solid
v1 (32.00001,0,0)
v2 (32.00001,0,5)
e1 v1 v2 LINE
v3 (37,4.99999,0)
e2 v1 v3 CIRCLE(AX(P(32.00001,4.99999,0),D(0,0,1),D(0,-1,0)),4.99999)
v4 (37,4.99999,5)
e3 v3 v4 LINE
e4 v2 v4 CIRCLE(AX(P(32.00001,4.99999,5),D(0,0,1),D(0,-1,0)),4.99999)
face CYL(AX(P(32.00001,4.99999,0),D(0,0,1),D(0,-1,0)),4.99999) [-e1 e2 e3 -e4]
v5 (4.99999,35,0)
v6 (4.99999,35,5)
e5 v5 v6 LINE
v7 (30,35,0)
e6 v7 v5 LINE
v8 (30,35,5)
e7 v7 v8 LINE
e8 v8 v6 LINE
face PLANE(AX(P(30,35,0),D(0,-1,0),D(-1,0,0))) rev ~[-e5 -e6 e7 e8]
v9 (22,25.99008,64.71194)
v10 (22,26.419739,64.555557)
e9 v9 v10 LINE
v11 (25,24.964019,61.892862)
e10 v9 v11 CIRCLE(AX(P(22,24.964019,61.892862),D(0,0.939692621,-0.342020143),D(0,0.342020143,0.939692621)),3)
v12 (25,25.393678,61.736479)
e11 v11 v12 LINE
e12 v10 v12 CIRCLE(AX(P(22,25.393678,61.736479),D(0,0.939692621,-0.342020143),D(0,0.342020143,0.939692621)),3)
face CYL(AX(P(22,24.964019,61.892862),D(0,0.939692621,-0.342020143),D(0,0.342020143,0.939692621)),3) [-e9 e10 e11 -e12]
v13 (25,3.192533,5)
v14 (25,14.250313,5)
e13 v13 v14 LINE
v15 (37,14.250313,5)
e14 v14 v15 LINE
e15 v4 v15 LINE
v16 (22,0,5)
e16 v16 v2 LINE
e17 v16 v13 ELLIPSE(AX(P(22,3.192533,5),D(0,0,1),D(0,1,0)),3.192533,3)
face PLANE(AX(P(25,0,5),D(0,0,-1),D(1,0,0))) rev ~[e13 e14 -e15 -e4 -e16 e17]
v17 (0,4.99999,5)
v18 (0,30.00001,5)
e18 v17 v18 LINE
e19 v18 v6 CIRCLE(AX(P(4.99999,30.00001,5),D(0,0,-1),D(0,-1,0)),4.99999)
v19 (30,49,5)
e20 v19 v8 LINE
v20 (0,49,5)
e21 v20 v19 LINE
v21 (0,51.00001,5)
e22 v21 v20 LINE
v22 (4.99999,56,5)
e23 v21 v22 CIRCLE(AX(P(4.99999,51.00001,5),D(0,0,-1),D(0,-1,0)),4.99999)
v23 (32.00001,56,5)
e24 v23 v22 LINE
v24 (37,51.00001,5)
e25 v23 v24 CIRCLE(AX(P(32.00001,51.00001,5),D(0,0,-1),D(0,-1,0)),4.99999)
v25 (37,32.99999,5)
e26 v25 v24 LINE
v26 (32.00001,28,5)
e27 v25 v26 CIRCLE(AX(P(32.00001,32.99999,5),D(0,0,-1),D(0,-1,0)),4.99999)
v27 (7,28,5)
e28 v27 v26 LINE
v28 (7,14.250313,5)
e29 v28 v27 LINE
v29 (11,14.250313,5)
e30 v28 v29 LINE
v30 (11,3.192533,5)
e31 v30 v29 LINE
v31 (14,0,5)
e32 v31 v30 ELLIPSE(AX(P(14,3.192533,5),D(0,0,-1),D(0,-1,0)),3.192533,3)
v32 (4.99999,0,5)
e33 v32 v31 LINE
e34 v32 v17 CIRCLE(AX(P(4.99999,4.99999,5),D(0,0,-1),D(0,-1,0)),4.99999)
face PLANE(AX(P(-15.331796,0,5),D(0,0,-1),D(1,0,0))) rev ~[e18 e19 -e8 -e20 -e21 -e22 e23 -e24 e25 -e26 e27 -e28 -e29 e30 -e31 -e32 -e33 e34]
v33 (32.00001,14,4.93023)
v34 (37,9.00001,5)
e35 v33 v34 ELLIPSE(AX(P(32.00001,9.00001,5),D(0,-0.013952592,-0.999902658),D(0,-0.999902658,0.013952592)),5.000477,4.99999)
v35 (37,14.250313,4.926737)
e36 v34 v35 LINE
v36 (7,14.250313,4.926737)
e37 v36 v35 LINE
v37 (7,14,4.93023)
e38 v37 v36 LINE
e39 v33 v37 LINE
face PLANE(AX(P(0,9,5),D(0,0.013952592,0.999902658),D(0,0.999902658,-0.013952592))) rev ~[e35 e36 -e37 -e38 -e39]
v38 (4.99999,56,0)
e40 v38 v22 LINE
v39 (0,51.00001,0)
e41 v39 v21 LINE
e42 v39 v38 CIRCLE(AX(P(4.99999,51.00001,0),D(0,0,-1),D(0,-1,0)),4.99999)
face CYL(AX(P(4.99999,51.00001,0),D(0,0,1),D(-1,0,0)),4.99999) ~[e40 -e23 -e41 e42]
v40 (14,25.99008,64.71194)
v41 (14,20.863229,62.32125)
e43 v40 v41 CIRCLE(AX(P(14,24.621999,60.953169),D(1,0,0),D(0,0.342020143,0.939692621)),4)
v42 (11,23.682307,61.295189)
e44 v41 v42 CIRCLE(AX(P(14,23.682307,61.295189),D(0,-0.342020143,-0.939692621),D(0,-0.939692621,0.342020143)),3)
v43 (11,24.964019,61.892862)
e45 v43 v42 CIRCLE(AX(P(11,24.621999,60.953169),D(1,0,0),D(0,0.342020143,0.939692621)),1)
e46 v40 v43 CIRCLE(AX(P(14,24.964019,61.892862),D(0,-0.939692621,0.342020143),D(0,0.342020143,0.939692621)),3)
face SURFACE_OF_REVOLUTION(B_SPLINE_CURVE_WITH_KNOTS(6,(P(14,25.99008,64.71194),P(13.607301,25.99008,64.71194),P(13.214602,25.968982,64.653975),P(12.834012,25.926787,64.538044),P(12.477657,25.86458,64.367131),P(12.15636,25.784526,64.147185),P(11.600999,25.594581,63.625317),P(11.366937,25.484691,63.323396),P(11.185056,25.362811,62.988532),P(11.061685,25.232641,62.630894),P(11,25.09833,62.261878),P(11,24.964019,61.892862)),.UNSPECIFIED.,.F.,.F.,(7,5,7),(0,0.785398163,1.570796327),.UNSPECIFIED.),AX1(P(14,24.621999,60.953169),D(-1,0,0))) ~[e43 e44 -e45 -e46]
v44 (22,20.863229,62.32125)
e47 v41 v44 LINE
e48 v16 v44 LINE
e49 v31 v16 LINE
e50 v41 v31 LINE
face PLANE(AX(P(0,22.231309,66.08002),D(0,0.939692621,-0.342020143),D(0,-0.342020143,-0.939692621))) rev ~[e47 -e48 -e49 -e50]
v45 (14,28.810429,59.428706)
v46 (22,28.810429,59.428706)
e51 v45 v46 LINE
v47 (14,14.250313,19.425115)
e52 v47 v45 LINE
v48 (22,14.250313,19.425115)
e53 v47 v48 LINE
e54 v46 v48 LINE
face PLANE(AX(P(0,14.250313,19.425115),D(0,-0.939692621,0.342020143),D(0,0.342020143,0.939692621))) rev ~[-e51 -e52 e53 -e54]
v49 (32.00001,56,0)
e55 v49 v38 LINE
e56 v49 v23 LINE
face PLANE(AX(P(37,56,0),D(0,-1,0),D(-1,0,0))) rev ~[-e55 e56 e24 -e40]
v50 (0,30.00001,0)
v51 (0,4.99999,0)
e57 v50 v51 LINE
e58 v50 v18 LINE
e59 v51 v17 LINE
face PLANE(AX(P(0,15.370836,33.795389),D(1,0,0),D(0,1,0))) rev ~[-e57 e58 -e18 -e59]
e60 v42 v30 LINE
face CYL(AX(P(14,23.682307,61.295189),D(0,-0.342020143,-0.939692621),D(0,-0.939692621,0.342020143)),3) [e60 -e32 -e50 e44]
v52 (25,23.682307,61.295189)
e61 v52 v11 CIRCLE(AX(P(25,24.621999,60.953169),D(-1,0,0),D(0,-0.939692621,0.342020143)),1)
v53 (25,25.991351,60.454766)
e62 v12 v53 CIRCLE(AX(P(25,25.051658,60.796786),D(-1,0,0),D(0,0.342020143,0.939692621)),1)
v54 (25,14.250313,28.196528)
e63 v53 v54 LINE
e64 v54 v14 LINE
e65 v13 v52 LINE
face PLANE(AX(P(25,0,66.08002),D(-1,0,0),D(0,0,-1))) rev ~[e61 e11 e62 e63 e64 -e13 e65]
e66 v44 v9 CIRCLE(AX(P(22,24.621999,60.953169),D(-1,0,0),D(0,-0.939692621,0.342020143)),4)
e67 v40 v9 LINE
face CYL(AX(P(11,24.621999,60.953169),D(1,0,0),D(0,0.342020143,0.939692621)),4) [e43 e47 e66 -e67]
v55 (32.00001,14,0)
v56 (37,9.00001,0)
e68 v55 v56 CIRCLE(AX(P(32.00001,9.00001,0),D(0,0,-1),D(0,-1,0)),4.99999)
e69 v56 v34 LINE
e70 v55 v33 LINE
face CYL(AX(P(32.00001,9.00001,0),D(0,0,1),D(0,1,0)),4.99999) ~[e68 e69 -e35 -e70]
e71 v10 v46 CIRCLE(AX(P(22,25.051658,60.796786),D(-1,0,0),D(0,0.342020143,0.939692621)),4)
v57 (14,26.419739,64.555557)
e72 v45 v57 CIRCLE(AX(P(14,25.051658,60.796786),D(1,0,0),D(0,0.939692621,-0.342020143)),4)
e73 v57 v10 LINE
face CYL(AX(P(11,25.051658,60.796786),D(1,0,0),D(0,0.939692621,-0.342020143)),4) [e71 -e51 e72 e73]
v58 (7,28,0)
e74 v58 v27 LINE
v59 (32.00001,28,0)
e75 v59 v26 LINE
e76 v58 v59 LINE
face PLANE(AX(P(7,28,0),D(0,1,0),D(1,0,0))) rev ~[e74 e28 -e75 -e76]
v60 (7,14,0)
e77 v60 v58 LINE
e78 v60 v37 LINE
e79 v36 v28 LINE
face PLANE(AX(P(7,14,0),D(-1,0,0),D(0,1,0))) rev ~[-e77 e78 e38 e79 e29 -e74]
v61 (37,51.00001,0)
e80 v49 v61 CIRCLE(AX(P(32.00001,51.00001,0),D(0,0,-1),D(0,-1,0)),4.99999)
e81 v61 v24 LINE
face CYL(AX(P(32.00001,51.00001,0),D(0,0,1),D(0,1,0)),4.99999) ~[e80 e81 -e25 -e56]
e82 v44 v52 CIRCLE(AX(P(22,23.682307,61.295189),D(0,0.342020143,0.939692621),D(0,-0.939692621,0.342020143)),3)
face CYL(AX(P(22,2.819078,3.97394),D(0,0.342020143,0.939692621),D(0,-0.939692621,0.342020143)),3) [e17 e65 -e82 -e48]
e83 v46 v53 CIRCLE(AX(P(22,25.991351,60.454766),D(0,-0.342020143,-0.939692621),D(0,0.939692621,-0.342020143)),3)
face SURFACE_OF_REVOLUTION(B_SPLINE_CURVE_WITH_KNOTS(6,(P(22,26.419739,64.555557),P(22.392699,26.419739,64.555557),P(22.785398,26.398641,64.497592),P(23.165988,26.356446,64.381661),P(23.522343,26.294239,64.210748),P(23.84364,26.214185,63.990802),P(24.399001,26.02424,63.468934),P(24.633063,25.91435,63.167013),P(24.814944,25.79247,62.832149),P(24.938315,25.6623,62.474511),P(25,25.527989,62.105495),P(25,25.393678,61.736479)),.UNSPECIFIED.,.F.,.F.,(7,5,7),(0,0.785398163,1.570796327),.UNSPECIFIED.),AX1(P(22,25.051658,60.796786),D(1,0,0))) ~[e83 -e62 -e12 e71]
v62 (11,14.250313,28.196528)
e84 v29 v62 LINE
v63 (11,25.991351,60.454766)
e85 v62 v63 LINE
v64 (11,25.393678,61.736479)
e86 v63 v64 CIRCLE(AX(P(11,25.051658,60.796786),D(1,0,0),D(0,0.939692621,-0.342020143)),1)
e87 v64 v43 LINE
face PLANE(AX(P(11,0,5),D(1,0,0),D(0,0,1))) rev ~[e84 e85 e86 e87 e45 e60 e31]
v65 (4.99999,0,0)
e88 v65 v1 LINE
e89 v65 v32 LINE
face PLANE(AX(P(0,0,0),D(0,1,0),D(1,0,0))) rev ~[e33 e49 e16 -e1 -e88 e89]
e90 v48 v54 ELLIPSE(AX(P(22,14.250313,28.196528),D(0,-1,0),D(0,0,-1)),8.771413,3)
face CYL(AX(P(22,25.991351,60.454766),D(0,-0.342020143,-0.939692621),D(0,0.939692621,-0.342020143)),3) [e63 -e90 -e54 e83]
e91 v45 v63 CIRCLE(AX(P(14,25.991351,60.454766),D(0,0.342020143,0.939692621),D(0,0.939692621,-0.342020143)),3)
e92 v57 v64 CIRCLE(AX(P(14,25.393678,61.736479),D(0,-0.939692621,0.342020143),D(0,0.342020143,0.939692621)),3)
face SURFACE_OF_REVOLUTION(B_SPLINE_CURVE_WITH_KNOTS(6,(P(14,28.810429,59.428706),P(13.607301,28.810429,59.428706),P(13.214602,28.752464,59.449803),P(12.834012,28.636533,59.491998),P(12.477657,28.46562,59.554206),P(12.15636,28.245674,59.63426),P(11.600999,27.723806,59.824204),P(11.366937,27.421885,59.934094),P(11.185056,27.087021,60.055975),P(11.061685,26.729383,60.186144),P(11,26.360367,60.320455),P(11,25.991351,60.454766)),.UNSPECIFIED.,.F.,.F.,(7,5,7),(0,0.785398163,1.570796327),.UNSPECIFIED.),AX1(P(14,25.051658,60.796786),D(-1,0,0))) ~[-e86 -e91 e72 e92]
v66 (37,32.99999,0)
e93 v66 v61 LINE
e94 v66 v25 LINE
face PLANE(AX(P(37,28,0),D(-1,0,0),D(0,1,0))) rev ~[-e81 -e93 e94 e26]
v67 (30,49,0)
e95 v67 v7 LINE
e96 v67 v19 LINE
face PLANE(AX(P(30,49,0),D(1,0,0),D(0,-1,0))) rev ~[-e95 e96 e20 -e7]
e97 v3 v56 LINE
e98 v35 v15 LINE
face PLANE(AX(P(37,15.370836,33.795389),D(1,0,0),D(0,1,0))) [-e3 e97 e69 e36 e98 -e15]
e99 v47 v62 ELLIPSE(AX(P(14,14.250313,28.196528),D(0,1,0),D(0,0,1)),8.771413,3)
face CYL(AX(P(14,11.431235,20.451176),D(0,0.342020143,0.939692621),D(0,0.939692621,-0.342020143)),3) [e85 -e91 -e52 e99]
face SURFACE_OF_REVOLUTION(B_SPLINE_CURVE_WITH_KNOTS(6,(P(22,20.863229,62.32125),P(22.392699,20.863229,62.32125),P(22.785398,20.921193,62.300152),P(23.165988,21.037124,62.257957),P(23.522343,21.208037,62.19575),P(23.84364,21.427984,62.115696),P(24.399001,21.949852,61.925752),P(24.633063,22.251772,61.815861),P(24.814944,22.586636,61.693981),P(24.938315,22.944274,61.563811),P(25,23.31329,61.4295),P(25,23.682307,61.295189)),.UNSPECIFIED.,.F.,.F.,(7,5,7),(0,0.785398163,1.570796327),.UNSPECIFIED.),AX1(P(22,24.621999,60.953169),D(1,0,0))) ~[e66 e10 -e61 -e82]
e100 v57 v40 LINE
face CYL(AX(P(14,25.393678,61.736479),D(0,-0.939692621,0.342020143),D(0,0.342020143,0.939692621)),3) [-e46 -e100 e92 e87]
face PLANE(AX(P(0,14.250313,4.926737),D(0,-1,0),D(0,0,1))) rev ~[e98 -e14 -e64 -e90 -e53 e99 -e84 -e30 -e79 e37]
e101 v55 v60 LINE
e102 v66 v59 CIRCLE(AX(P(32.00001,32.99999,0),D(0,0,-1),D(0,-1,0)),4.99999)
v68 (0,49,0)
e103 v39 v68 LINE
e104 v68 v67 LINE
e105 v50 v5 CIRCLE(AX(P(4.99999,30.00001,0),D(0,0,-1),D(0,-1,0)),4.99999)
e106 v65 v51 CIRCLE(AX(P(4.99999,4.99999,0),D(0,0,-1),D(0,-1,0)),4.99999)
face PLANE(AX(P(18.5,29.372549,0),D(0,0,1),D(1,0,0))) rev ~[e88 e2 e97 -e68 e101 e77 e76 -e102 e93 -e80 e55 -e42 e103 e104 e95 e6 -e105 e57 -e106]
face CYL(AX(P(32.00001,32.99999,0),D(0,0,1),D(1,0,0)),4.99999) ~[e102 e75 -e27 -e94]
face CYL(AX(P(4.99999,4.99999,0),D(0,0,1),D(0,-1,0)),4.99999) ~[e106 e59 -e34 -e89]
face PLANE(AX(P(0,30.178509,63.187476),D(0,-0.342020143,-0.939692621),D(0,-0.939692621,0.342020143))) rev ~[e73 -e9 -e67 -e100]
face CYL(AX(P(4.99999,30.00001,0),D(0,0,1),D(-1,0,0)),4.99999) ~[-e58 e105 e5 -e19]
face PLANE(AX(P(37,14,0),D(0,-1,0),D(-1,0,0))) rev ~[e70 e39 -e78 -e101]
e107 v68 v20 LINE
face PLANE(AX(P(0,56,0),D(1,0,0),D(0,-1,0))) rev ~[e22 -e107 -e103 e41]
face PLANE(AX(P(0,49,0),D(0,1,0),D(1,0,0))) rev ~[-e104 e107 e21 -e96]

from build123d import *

# Parameters (mm, degrees)
F1_DEPTH = 5
F3_DEPTH = 37
F5_DEPTH = 36.2749
F6_R     = 4
F7_R     = 3
F8_R     = 4.99999


# Not quite as in the source:
# - a fillet or chamfer is up to 0.001 mm smaller than in the source, because OpenCascade refuses the exact size


with BuildPart() as f1:
    # F0 (on Top) → F1 (new body)
    with BuildSketch(Plane.XY):
        Polygon((0, 35), (0, 0), (37, 0), (37, 14), (7, 14), (7, 28), (37, 28), (37, 35), (37, 56), (0, 56), (0, 49), (30, 49), (30, 35), align=None)
    extrude(amount=F1_DEPTH)

    # F2 (on Right) → F3 (join)
    with BuildSketch(Plane.YZ):
        Polygon((22.2313093162, 66.0800203511), (0, 5), (9, 5), (14.2503125495, 4.9267373979), (14.2503125495, 19.4251151749), (30.1785093102, 63.1874761075), align=None)
    extrude(amount=F3_DEPTH)

    # F4 (on Front) → F5 (cut)
    with BuildSketch(Plane.XZ):
        Polygon((11, 5), (11, 66.0800203511), (25, 66.0800203511), (25, 5), (61.9937415394, 5), (61.9937415394, 77.6014764043), (-15.3317964795, 77.6014764043), (-15.3317964795, 5), align=None)
    extrude(amount=-F5_DEPTH, mode=Mode.SUBTRACT)

    # F6
    f6_edges = [f1.edges().sort_by_distance(p)[0] for p in [
        (18, 22.231309, 66.08002),
        (18, 30.178509, 63.187476),
    ]]
    fillet(f6_edges, radius=F6_R)

    # F7
    f7_edges = [f1.edges().sort_by_distance(p)[0] for p in [
        (11, 21.530371, 39.42691),
        (11, 10.431614, 33.660625),
        (25, 21.530371, 39.42691),
        (25, 10.431614, 33.660625),
    ]]
    fillet(f7_edges, radius=F7_R)

    # F8 (radius 5 in the source; OpenCascade refuses exactly that, so slightly less here)
    f8_edges = [f1.edges().sort_by_distance(p)[0] for p in [
        (37, 0, 2.5),
        (37, 28, 2.5),
        (37, 14, 2.465115),
        (0, 0, 2.5),
        (0, 35, 2.5),
        (0, 56, 2.5),
        (37, 56, 2.5),
    ]]
    fillet(f8_edges, radius=F8_R)


solid = f1.part
